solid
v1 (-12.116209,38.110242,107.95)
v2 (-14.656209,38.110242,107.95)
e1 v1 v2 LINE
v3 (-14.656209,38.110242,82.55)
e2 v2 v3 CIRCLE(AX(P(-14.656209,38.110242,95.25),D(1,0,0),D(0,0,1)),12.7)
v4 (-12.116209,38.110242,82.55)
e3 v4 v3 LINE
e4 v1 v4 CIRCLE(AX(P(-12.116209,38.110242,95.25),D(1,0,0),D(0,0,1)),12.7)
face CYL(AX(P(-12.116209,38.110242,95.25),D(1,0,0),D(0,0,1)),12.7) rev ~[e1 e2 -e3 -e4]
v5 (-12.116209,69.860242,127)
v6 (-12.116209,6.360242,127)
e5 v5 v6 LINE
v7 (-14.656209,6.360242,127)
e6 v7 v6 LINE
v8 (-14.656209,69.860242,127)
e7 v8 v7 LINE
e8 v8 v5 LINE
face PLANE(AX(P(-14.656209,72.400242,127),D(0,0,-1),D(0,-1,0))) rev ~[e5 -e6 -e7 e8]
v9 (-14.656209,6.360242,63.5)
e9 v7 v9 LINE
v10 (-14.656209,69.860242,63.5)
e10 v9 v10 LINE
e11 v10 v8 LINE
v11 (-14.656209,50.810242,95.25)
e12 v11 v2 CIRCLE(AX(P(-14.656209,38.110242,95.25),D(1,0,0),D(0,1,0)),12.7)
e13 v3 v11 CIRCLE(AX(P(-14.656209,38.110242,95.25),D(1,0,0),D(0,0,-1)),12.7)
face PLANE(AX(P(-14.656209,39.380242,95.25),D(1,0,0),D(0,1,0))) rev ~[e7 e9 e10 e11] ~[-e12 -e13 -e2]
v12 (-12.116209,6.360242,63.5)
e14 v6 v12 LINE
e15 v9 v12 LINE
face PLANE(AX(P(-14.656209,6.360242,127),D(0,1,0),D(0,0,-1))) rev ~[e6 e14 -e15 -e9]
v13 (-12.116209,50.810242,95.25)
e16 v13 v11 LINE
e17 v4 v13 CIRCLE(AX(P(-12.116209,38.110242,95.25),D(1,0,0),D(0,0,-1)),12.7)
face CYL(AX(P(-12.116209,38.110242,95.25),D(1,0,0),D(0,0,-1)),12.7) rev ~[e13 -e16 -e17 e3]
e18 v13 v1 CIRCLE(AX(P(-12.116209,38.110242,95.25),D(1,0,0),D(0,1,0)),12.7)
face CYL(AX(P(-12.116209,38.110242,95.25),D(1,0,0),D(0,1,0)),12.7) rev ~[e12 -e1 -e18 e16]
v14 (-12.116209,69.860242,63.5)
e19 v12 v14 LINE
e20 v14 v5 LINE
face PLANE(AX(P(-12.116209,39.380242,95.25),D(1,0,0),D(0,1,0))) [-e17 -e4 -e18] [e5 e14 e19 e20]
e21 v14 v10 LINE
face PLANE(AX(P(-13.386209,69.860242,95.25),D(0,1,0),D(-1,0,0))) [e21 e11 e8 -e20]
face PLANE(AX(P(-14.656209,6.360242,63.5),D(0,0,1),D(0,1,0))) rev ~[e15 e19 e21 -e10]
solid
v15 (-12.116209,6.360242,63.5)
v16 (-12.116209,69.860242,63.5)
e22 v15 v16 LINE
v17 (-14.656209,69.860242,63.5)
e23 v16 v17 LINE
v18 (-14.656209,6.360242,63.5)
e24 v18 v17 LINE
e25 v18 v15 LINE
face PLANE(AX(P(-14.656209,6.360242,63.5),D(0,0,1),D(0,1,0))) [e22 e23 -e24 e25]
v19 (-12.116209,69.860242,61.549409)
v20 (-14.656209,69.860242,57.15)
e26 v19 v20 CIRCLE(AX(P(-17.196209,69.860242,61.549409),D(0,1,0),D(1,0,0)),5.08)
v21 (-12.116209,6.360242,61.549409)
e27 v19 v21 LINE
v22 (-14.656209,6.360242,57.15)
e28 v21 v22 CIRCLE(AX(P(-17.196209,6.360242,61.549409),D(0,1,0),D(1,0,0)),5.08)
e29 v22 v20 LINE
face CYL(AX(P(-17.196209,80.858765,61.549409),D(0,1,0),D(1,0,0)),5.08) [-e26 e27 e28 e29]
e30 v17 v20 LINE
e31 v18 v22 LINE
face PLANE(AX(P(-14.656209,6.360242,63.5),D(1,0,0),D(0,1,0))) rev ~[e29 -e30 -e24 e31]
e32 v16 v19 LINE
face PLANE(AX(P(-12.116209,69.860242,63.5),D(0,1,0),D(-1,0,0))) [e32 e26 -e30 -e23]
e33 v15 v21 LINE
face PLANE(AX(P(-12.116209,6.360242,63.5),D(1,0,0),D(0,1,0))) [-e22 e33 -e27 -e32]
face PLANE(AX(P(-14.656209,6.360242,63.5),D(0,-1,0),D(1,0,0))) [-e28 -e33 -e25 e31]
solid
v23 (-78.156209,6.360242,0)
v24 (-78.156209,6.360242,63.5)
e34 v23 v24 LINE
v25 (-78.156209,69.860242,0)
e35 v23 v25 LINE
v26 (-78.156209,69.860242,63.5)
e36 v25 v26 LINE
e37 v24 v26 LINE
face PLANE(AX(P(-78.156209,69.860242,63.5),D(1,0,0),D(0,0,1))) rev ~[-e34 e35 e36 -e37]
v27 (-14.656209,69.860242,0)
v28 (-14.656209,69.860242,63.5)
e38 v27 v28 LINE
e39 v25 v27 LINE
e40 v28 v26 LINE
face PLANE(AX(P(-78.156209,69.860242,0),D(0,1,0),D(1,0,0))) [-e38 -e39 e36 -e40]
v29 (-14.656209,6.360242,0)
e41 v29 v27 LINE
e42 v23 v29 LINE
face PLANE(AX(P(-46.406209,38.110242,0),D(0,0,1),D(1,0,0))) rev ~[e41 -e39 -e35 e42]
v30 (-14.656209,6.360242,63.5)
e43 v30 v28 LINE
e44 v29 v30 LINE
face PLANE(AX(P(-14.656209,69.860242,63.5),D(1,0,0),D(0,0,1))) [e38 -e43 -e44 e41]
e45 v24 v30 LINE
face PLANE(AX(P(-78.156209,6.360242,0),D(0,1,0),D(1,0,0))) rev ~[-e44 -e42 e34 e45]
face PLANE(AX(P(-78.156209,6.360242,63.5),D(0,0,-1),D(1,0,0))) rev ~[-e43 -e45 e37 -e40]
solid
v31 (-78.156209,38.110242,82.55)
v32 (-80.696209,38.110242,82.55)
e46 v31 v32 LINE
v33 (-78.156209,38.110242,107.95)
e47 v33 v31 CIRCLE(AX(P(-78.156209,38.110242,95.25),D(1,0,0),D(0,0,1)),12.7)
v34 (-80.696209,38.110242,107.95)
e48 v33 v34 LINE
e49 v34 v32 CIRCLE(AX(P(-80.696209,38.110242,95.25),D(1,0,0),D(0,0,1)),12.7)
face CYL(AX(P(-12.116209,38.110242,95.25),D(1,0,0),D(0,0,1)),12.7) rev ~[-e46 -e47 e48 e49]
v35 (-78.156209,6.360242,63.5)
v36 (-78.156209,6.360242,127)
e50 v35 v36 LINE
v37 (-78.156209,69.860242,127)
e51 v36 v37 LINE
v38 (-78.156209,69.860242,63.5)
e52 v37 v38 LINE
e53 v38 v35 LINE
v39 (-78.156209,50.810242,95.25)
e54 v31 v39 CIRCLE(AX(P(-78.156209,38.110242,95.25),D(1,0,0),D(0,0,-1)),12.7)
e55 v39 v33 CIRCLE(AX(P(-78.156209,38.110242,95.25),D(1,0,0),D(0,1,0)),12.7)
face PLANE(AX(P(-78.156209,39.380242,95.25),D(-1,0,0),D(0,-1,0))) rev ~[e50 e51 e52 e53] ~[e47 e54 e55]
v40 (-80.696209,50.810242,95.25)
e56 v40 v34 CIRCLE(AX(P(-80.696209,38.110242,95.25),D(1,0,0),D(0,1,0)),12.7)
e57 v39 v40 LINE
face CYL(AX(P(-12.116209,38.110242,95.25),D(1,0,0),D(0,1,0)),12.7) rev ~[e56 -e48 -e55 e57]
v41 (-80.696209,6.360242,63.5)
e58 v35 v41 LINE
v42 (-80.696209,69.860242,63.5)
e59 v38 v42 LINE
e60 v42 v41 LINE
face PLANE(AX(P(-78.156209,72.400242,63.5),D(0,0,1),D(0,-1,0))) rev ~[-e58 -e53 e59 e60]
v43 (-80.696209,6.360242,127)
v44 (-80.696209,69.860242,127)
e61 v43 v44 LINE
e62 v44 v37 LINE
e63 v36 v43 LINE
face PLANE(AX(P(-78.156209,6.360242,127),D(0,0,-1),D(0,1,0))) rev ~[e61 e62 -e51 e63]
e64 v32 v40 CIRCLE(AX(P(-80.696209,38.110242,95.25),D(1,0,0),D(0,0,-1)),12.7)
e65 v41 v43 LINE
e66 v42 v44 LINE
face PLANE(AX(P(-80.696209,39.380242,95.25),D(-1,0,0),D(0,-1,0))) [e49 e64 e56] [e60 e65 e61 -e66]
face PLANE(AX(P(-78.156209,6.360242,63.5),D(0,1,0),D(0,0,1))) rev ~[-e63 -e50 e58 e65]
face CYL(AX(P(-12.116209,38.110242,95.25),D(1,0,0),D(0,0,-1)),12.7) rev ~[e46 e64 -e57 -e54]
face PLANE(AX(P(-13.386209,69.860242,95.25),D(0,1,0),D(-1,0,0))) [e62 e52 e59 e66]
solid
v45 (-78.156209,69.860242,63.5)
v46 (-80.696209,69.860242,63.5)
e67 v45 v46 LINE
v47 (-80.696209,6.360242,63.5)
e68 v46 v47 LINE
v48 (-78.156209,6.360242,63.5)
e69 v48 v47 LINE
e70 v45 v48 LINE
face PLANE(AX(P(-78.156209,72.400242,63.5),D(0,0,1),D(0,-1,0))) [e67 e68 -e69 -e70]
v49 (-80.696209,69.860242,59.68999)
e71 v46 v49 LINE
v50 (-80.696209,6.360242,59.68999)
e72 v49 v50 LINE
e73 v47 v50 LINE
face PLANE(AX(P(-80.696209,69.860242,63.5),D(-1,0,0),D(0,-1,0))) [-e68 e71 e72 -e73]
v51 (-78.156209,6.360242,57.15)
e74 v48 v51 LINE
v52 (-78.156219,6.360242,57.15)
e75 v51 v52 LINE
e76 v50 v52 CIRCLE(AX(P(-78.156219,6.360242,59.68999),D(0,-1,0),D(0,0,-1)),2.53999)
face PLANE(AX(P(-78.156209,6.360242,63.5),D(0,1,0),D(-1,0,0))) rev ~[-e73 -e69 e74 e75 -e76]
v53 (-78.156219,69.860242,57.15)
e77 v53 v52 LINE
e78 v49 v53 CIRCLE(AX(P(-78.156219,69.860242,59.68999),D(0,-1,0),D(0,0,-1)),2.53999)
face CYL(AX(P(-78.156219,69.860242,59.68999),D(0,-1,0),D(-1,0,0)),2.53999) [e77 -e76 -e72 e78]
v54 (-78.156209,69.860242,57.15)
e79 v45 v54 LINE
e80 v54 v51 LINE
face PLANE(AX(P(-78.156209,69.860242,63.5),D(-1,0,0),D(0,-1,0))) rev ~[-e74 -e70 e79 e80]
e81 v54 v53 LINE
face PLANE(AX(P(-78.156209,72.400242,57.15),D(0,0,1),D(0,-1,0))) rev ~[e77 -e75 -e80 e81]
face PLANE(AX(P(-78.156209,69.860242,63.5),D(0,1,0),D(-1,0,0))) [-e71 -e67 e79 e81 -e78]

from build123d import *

# Parameters (mm, degrees)
F0_W         = 63.5
F0_H         = 63.5
F1_DEPTH     = 127
F2_W         = 63.5
F2_H         = 63.5
F3_DEPTH     = 2.54
F5_DEPTH     = 2.54
F7_DEPTH     = 2.54
F8_W         = 2.54
F8_H         = 63.5
F8_W_2       = 63.5
F9_DEPTH     = 2.54
F10_W        = 63.5
F10_H        = 63.5
F11_DEPTH    = 63.501
F12_DEPTH    = 6.35
F13_R        = 2.53999
F14_T1_DEPTH = 85.4970452561
F16_DEPTH    = 127
F18_DEPTH    = 25.4


# Not quite as in the source:
# - a fillet or chamfer that OpenCascade refuses, or shapes differently, is made with other operations: its cross-section is extruded or revolved along the edge and cut away or added
# - a fillet or chamfer is up to 0.001 mm smaller than in the source, because OpenCascade refuses the exact size


with BuildPart() as f1:
    # F0 (on Top) → F1 (new body)
    with BuildSketch(Plane.XY):
        with Locations((-46.4062093869, 38.1102421433)):
            Rectangle(F0_W, F0_H)
    extrude(amount=F1_DEPTH)

    # F2 (on face) → F3 (join)
    with BuildSketch(Plane(origin=(0, 69.8602421433, 0), x_dir=(-1, 0, 0), z_dir=(0, 1, 0))):
        with Locations((46.4062093869, 95.25)):
            Rectangle(F2_W, F2_H)
    extrude(amount=F3_DEPTH)


with BuildPart() as f5:
    # F4 (on face) → F5 (new body)
    with BuildSketch(Plane(origin=(-78.1562093869, 0, 0), x_dir=(0, -1, 0), z_dir=(-1, 0, 0))):
        Polygon((-6.3602421433, 127), (-72.4002421433, 127), (-72.4002421433, 63.5), (-69.8602421433, 63.5), (-6.3602421433, 63.5), align=None)
    extrude(amount=F5_DEPTH)


with BuildPart() as f7:
    # F6 (on face) → F7 (new body)
    with BuildSketch(Plane.YZ.offset(-14.6562093869)):
        Polygon((72.4002421433, 127), (6.3602421433, 127), (6.3602421433, 63.5), (69.8602421433, 63.5), (72.4002421433, 63.5), align=None)
    extrude(amount=F7_DEPTH)


with BuildPart() as f9_tool:
    # F8 (on face) → F9 (new body)
    with BuildSketch(Plane(origin=(0, 72.4002421433, 0), x_dir=(-1, 0, 0), z_dir=(0, 1, 0))):
        with Locations((13.3862093869, 95.25)):
            Rectangle(F8_W, F8_H)
        with Locations((46.4062093869, 95.25)):
            Rectangle(F8_W_2, F8_H)
        with Locations((79.4262093869, 95.25)):
            Rectangle(F8_W, F8_H)
    extrude(amount=-F9_DEPTH)


with BuildPart() as f1_1:
    add(f1.part)

    # F9: cut by f9_tool
    add(f9_tool.part, mode=Mode.SUBTRACT)

    # F10 (on face) → F11 (cut, through all)
    with BuildSketch(Plane.XZ.offset(-6.3602421433)):
        with Locations((-46.4062093869, 95.25)):
            Rectangle(F10_W, F10_H)
    extrude(amount=-F11_DEPTH, mode=Mode.SUBTRACT)

    # F17 (on face) → F18 (cut)
    with BuildSketch(Plane(origin=(-80.6962093869, 0, 0), x_dir=(0, -1, 0), z_dir=(-1, 0, 0))):
        with BuildLine():
            Line((-38.1102421433, 95.25), (-38.1102421433, 107.95))
            ThreePointArc((-38.1102421433, 107.95), (-47.0904982643, 104.2302561211), (-50.8102421433, 95.25))
            Line((-50.8102421433, 95.25), (-38.1102421433, 95.25))
        make_face()
        with BuildLine():
            Line((-38.1102421433, 95.25), (-50.8102421433, 95.25))
            ThreePointArc((-50.8102421433, 95.25), (-47.0904982643, 86.2697438789), (-38.1102421433, 82.55))
            Line((-38.1102421433, 82.55), (-38.1102421433, 95.25))
        make_face()
        with BuildLine():
            ThreePointArc((-25.4102421433, 95.25), (-29.1299860222, 104.2302561211), (-38.1102421433, 107.95))
            Line((-38.1102421433, 107.95), (-38.1102421433, 95.25))
            Line((-38.1102421433, 95.25), (-38.1102421433, 82.55))
            ThreePointArc((-38.1102421433, 82.55), (-29.1299860222, 86.2697438789), (-25.4102421433, 95.25))
        make_face()
    extrude(amount=-F18_DEPTH, mode=Mode.SUBTRACT)


with BuildPart() as f5_1:
    add(f5.part)

    # F9: cut by f9_tool
    add(f9_tool.part, mode=Mode.SUBTRACT)


with BuildPart() as f7_1:
    add(f7.part)

    # F9: cut by f9_tool
    add(f9_tool.part, mode=Mode.SUBTRACT)


with BuildPart() as f12:
    # F12 (new): a face of the model
    f12_faces = [f5_1.part.faces().sort_by_distance(p)[0] for p in [
        (-79.4262093869, 38.1102421433, 63.5),
    ]]
    extrude(f12_faces, amount=F12_DEPTH)

    # F13 (radius 2.54 in the source; OpenCascade refuses exactly that, so slightly less here)
    f13_edges = [f12.edges().sort_by_distance(p)[0] for p in [
        (-80.696209, 38.110242, 57.15),
    ]]
    fillet(f13_edges, radius=F13_R)


with BuildPart() as f12b:
    # F12#2 (new): a face of the model
    f12_2_faces = [f7_1.part.faces().sort_by_distance(p)[0] for p in [
        (-13.3862093869, 38.1102421433, 63.5),
    ]]
    extrude(f12_2_faces, amount=F12_DEPTH)

    # F14: fillet of radius 5.08 on 1 edges, made by hand

    # F14_s2 → F14_t1 (cut)
    with BuildSketch(Plane.XZ.offset(-80.8587647713)):
        with BuildLine():
            ThreePointArc((-12.1162093869, 61.5494090512), (-12.7968003357, 59.0094090512), (-14.6562093869, 57.15))
            Line((-14.6562093869, 57.15), (-12.1162093869, 57.15))
            Line((-12.1162093869, 57.15), (-12.1162093869, 61.5494090512))
        make_face()
    extrude(amount=F14_T1_DEPTH, mode=Mode.SUBTRACT)


with BuildPart() as f16_tool:
    # F15 (on face) → F16 (new body)
    with BuildSketch(Plane.YZ.offset(-12.1162093869)):
        with BuildLine():
            Line((38.1102421433, 95.25), (38.1102421433, 107.95))
            ThreePointArc((38.1102421433, 107.95), (25.4102421433, 95.25), (38.1102421433, 82.55))
            Line((38.1102421433, 82.55), (38.1102421433, 95.25))
        make_face()
        with BuildLine():
            ThreePointArc((50.8102421433, 95.25), (47.0904982643, 104.2302561211), (38.1102421433, 107.95))
            Line((38.1102421433, 107.95), (38.1102421433, 95.25))
            Line((38.1102421433, 95.25), (38.1102421433, 82.55))
            ThreePointArc((38.1102421433, 82.55), (47.0904982643, 86.2697438789), (50.8102421433, 95.25))
        make_face()
    extrude(amount=-F16_DEPTH)


with BuildPart() as f5_2:
    add(f5_1.part)

    # F16: cut by f16_tool
    add(f16_tool.part, mode=Mode.SUBTRACT)


with BuildPart() as f7_2:
    add(f7_1.part)

    # F16: cut by f16_tool
    add(f16_tool.part, mode=Mode.SUBTRACT)


solid = Compound([f1_1.part, f12.part, f12b.part, f5_2.part, f7_2.part])
